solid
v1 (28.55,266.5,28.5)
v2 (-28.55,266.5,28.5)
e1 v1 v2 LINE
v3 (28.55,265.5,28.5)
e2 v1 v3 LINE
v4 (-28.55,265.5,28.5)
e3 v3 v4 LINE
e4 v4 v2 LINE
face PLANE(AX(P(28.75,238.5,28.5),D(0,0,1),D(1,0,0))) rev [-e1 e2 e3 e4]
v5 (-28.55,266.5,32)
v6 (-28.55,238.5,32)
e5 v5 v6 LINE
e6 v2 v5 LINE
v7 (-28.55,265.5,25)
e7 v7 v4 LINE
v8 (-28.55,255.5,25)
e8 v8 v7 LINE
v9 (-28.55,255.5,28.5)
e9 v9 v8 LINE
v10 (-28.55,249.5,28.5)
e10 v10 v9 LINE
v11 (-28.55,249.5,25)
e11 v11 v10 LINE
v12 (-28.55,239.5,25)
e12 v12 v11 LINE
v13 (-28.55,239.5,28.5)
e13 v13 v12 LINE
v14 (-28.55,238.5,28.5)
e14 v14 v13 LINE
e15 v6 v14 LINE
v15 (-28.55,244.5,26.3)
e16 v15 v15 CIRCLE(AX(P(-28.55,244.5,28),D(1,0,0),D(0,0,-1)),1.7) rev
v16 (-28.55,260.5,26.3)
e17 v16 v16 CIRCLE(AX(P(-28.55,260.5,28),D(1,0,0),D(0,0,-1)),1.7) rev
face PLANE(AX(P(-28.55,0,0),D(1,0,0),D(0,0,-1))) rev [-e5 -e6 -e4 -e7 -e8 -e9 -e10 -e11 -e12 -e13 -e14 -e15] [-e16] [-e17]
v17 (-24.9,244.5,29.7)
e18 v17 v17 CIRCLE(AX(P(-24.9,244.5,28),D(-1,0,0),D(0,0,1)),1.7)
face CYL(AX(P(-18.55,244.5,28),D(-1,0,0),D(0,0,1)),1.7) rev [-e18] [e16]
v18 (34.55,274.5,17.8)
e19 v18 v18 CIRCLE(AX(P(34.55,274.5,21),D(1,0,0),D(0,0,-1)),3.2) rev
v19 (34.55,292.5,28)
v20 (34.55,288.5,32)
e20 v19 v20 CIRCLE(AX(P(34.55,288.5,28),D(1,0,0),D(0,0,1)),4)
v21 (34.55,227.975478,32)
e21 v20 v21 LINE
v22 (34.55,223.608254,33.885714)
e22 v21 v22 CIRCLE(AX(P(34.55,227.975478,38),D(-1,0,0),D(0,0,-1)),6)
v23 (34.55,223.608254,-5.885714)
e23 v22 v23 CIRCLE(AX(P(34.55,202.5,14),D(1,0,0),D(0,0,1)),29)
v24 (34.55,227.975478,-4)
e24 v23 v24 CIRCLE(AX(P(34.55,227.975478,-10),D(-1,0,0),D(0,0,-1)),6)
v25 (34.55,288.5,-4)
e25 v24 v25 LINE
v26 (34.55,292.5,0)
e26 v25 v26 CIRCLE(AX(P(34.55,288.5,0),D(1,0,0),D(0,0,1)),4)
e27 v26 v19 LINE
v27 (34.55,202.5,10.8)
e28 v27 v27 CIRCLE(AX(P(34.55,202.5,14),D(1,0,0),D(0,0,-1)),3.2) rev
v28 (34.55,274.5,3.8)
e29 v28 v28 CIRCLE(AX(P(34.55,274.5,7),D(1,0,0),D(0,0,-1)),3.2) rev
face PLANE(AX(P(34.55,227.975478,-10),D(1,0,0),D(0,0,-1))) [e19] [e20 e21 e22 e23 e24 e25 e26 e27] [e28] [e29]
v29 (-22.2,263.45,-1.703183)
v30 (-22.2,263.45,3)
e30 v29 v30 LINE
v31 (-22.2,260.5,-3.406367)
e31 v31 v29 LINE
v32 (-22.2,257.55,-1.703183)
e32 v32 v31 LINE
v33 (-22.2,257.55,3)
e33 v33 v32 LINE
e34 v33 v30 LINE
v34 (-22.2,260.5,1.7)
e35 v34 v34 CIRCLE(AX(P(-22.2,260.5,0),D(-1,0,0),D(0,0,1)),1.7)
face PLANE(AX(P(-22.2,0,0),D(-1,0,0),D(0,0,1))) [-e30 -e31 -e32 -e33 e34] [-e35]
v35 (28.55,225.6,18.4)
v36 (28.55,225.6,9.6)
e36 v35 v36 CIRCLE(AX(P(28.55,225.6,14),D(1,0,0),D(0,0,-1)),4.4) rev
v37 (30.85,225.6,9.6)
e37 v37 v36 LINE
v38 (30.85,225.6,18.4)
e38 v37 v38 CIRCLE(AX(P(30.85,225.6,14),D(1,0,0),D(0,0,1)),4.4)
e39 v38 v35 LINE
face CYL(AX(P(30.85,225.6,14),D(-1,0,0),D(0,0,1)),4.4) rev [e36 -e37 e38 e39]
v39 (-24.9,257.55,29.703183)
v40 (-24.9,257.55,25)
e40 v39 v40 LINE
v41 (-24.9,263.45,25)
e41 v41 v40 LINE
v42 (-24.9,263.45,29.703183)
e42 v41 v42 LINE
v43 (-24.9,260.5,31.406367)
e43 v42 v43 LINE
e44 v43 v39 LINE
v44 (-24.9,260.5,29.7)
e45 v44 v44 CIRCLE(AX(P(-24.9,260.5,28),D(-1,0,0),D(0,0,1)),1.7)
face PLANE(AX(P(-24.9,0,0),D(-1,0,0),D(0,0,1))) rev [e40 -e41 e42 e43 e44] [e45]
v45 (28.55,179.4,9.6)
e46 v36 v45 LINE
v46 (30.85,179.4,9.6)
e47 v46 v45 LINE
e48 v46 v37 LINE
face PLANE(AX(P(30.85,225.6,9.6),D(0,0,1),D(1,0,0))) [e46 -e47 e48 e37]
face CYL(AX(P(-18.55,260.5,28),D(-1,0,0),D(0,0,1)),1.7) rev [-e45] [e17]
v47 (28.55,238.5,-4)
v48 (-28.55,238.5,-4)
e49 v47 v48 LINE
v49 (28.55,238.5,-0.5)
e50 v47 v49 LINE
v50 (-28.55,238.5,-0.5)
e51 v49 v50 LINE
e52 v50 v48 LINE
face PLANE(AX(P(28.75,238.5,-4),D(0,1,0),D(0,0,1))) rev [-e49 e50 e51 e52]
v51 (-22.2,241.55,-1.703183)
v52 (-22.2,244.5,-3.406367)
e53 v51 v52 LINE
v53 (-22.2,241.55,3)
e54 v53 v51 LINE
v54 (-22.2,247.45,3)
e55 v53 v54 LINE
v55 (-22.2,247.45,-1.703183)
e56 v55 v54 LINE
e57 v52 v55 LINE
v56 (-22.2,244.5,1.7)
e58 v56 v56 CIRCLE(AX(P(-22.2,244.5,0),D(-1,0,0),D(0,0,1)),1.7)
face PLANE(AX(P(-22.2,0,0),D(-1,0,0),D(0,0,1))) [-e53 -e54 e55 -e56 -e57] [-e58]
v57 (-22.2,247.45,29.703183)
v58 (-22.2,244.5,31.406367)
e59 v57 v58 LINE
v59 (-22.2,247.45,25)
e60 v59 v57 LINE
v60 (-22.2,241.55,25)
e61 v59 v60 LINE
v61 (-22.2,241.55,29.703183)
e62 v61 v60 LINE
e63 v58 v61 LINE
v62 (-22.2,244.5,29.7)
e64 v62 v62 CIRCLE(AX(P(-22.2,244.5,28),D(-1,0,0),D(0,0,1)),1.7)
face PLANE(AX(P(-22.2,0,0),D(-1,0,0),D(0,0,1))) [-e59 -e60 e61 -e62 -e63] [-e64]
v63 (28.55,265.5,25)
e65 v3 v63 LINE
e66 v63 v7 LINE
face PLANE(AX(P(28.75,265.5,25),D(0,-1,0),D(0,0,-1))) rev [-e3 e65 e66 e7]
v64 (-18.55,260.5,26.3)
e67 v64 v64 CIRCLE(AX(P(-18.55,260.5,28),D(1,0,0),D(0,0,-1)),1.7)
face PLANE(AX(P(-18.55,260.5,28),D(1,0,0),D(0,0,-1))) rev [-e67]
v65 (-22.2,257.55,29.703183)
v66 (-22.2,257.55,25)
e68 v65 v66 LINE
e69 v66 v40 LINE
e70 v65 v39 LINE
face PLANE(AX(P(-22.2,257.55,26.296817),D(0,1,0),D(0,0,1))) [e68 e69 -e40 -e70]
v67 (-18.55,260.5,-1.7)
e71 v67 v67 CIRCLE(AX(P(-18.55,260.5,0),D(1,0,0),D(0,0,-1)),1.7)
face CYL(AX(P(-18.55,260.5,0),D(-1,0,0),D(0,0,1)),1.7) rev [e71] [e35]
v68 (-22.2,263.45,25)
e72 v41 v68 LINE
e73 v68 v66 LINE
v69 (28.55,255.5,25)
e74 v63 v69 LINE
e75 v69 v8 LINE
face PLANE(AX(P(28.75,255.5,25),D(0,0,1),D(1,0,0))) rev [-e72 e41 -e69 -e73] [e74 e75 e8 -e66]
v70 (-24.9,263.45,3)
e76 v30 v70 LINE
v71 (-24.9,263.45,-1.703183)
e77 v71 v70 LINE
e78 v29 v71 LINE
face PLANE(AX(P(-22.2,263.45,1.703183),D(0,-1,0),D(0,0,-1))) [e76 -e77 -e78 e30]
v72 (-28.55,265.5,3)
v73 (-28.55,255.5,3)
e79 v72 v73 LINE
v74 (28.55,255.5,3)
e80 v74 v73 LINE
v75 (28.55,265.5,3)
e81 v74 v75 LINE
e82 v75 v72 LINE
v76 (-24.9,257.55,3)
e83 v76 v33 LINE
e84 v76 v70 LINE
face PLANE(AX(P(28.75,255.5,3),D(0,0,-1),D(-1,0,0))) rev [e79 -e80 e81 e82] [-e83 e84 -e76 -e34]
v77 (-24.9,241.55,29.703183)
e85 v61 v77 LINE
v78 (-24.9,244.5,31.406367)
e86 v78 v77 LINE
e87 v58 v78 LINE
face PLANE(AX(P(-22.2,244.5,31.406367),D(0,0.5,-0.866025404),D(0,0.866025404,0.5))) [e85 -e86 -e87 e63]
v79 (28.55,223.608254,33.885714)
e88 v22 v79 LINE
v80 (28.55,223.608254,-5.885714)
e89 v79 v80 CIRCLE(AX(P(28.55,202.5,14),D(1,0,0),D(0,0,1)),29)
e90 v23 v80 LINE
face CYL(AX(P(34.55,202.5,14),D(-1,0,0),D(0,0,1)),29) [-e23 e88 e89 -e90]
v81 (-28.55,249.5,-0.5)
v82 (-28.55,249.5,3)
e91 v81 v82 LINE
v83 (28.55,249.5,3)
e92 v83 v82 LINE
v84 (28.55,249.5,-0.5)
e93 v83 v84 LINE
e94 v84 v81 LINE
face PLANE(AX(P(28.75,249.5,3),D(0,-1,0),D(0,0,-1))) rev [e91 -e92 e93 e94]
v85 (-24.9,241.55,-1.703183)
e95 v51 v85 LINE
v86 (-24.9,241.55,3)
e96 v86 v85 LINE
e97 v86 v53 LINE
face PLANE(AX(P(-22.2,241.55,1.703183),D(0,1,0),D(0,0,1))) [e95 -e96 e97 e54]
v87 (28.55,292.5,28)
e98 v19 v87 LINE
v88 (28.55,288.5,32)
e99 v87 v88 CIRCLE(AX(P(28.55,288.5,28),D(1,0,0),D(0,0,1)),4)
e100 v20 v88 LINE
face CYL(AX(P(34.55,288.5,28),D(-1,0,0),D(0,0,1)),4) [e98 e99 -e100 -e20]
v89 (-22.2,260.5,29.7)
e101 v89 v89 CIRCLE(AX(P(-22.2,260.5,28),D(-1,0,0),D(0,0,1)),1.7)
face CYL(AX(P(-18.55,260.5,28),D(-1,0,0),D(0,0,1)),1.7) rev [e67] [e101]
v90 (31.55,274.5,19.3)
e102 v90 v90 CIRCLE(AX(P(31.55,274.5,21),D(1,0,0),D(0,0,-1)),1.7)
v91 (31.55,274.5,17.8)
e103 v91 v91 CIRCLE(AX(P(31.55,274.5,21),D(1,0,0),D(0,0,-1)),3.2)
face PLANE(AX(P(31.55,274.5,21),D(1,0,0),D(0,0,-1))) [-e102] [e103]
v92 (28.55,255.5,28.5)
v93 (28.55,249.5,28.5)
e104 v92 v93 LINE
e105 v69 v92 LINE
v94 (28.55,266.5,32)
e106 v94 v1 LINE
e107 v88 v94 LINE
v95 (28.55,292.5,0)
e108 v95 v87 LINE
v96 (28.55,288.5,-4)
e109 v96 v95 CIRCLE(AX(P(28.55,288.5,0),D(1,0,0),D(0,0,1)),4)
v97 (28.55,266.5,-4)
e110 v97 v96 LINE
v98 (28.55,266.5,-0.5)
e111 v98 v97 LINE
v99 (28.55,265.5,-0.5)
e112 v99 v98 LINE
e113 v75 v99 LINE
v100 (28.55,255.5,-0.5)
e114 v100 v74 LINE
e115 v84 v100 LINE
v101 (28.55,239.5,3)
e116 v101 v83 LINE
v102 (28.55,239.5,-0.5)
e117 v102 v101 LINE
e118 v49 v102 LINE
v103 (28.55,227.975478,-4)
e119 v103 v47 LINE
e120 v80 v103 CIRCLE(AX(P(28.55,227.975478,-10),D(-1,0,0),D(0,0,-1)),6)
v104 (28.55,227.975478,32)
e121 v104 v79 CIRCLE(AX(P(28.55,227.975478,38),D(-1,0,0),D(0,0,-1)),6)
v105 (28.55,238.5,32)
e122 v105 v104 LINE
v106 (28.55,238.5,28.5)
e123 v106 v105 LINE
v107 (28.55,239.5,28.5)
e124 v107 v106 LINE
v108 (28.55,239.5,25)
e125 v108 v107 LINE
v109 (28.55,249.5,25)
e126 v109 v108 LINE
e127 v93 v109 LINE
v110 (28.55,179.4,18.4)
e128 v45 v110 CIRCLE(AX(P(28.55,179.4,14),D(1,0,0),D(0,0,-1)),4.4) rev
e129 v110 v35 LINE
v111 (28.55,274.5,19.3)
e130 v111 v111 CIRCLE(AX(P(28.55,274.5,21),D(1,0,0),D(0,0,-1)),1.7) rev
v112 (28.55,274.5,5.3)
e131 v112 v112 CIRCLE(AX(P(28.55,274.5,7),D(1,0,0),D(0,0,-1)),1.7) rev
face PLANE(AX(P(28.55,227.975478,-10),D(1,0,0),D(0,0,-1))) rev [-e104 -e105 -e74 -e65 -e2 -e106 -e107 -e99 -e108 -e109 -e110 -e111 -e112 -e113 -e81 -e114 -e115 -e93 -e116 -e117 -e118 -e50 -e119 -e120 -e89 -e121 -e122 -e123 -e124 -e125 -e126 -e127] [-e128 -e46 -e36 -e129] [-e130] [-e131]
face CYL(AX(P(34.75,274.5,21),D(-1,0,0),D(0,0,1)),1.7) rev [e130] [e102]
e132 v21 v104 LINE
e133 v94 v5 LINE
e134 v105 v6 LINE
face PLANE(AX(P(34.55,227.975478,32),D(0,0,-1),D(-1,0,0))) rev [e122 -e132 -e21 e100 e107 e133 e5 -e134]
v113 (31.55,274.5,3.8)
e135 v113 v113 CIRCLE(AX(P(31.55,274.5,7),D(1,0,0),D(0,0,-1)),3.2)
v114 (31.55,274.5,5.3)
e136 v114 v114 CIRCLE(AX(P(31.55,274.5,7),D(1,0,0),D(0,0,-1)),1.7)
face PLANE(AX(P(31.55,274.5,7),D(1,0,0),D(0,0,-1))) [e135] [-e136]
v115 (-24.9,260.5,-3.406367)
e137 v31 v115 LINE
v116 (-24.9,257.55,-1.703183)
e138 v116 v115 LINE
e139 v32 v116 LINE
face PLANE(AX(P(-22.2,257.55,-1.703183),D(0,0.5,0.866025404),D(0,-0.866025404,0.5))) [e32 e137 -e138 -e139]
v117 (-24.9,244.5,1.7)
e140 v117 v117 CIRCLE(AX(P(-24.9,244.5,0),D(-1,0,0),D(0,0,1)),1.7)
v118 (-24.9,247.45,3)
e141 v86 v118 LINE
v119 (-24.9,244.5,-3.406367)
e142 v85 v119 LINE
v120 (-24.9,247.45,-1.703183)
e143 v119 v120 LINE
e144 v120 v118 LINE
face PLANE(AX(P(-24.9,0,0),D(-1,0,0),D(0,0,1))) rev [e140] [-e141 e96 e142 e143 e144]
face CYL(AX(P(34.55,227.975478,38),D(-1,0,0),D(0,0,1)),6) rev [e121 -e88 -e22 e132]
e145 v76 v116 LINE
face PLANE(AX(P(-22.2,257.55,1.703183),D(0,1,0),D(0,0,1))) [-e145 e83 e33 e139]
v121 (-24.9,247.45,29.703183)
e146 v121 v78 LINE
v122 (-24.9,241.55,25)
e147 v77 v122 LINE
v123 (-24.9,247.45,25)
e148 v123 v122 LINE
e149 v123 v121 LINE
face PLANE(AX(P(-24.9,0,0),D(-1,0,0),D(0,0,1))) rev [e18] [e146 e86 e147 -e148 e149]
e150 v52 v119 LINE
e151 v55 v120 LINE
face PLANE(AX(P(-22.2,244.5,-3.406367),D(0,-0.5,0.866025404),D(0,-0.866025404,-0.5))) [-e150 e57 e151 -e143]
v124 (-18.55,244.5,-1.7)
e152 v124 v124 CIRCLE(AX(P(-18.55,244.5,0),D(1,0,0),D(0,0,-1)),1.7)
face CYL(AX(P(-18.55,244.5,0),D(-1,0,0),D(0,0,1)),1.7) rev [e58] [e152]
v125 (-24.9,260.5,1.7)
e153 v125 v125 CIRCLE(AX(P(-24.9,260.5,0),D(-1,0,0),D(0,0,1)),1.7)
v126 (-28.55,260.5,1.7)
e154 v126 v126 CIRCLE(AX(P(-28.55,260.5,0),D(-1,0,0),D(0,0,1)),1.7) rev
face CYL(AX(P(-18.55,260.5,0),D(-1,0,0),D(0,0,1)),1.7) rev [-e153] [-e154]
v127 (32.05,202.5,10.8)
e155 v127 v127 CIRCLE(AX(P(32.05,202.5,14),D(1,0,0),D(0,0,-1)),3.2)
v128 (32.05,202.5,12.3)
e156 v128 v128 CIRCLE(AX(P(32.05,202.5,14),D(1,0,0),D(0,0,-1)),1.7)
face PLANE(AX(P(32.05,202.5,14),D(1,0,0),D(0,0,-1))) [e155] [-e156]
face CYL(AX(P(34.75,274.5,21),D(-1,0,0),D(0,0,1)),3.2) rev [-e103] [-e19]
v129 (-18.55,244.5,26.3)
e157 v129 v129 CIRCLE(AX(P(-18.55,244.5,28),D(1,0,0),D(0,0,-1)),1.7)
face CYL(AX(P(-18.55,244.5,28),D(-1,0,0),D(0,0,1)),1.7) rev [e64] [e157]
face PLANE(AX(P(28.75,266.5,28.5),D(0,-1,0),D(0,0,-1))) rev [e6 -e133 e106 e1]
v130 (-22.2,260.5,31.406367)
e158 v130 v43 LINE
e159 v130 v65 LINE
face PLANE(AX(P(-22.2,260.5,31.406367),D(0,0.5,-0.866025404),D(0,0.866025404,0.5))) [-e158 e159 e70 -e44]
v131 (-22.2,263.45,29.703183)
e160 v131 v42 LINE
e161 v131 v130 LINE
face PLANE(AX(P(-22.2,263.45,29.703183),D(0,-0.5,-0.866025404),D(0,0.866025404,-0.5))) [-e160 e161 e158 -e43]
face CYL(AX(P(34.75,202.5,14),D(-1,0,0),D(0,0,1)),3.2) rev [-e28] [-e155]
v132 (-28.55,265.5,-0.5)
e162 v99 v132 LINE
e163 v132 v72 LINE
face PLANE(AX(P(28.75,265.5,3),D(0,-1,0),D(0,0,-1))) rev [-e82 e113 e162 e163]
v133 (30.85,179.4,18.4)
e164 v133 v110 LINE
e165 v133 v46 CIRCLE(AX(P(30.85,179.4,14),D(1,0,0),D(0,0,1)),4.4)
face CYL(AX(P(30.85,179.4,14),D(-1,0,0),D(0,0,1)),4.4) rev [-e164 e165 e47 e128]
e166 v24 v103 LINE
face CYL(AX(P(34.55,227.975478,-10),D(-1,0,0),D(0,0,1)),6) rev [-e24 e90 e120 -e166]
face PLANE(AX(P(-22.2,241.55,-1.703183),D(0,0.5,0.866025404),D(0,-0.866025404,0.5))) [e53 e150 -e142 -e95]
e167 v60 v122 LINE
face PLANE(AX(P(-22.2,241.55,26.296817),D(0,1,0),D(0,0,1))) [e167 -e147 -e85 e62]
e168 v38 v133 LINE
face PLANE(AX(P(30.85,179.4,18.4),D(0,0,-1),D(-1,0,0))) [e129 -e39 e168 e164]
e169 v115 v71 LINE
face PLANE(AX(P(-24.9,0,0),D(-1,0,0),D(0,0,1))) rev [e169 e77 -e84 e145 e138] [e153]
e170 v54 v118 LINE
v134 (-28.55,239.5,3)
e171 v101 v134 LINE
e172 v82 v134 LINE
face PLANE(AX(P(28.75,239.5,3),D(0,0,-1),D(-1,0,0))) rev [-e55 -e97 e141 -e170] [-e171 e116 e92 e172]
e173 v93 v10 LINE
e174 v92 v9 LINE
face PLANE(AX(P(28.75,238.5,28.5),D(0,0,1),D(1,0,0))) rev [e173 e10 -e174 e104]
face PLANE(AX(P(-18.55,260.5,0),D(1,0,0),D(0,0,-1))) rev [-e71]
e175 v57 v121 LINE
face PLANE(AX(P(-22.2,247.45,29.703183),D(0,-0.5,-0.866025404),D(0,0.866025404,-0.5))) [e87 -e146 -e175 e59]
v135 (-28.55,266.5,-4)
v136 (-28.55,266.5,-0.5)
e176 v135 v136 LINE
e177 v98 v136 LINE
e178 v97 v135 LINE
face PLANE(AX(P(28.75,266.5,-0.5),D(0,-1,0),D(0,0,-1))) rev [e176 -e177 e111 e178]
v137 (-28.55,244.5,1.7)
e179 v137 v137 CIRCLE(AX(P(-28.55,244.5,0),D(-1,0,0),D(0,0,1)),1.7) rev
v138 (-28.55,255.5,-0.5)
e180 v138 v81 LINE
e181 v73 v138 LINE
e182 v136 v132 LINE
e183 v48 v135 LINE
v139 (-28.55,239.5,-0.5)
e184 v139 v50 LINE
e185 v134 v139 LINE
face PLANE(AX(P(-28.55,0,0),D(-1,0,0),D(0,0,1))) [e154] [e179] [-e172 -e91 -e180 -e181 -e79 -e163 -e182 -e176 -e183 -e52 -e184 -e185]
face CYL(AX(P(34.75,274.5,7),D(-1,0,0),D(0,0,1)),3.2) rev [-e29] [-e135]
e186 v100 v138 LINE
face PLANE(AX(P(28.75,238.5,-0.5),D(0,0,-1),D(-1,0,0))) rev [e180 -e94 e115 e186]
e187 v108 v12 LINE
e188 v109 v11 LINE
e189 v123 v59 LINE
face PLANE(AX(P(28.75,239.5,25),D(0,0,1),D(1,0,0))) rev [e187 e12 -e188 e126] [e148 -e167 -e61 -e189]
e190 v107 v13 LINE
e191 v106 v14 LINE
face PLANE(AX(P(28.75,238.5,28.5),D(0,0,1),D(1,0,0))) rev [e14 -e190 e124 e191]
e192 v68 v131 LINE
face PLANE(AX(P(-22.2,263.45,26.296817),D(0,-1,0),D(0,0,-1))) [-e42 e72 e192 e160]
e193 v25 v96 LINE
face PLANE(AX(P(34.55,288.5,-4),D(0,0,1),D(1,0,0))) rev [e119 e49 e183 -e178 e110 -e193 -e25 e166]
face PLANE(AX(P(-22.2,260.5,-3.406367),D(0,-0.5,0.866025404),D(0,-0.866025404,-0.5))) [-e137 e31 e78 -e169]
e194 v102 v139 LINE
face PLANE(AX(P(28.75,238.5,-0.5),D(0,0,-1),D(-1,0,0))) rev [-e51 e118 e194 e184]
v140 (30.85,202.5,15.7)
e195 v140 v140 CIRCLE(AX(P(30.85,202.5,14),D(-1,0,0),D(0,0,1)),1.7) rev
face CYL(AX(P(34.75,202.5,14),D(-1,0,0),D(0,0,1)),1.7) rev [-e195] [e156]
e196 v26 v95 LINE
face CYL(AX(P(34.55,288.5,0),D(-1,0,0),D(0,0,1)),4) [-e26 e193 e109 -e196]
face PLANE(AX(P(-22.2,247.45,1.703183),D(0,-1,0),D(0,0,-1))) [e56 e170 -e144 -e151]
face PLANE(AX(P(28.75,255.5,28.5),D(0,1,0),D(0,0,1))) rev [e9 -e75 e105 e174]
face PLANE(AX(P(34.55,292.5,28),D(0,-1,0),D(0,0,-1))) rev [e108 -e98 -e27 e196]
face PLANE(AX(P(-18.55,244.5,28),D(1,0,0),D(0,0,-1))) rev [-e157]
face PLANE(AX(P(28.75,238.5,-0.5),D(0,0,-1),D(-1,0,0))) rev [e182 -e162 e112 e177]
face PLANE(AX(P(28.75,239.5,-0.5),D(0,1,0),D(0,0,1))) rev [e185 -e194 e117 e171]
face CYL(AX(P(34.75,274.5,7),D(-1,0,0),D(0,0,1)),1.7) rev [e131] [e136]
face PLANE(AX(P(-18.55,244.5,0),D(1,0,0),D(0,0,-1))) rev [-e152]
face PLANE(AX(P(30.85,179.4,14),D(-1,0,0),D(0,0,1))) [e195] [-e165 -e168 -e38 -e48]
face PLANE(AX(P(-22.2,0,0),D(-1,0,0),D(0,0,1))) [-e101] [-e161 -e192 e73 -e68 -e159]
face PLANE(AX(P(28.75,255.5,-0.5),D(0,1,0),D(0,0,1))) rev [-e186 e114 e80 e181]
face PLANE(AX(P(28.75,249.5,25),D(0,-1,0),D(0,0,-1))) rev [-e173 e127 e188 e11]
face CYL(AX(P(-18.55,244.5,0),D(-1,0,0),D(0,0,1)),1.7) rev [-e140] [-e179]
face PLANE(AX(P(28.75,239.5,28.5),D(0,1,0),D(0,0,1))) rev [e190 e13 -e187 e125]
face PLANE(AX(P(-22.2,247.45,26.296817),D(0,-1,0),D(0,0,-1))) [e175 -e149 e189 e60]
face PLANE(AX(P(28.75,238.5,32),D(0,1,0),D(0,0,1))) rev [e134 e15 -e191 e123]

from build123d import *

# Parameters (mm, degrees)
PLATE_START                   = 28.55
PLATE_D_DEPTH                 = 6
BOX_START                     = -28.55
SKETCH2_W                     = 3.5
SKETCH2_H                     = 28
BOX_WALLS_DEPTH               = 57.3
WALL_START                    = -28.55
SKETCH3_W                     = 3.5
SKETCH3_H                     = 10
WALL_BOSSES_DEPTH             = 57.3
HORN_START                    = 28.35
HORN_POCKET_DEPTH             = 2.5
BOLT_START                    = 28.35
SKETCH5_R                     = 1.7
BOLT_HOLES_DEPTH              = 6.4
HUB_START                     = 32.05
SKETCH6_R                     = 3.2
HUB_COUNTERBORE_DEPTH         = 2.7
HEAD_MOUNT_START              = 31.55
SKETCH7_R                     = 3.2
HEAD_MOUNT_COUNTERBORES_DEPTH = 3.2
COVER_START                   = -28.75
SKETCH8_R                     = 1.7
COVER_BOLT_HOLES_DEPTH        = 10.2
COVER_START_2                 = -24.9
COVER_NUT_SLOTS_DEPTH         = 2.7


with BuildPart() as part:
    # Sketch1 → Plate D (new body)
    with BuildSketch(Plane(origin=(0, 0, 0), x_dir=(0, 0, -1), z_dir=(1, 0, 0)).offset(PLATE_START)):
        with BuildLine():
            Line((-32, 227.975478406), (-32, 288.5))
            ThreePointArc((-32, 288.5), (-30.828427125, 291.328427125), (-28, 292.5))
            Line((-28, 292.5), (0, 292.5))
            ThreePointArc((0, 292.5), (2.828427125, 291.328427125), (4, 288.5))
            Line((4, 288.5), (4, 227.975478406))
            ThreePointArc((4, 227.975478406), (4.49156491, 225.597003504), (5.885714286, 223.608253536))
            ThreePointArc((5.885714286, 223.608253536), (-14, 173.5), (-33.885714286, 223.608253536))
            ThreePointArc((-33.885714286, 223.608253536), (-32.49156491, 225.597003504), (-32, 227.975478406))
        make_face()
    extrude(amount=PLATE_D_DEPTH)

    # Sketch2 → Box walls (add)
    with BuildSketch(Plane(origin=(0, 0, 0), x_dir=(0, 0, -1), z_dir=(1, 0, 0)).offset(BOX_START)):
        with Locations((2.25, 252.5)):
            Rectangle(SKETCH2_W, SKETCH2_H)
        with Locations((-30.25, 252.5)):
            Rectangle(SKETCH2_W, SKETCH2_H)
    extrude(amount=BOX_WALLS_DEPTH)

    # Sketch3 → Wall bosses (add)
    with BuildSketch(Plane(origin=(0, 0, 0), x_dir=(0, 0, -1), z_dir=(1, 0, 0)).offset(WALL_START)):
        with Locations((-1.25, 244.5)):
            Rectangle(SKETCH3_W, SKETCH3_H)
        with Locations((-26.75, 244.5)):
            Rectangle(SKETCH3_W, SKETCH3_H)
        with Locations((-1.25, 260.5)):
            Rectangle(SKETCH3_W, SKETCH3_H)
        with Locations((-26.75, 260.5)):
            Rectangle(SKETCH3_W, SKETCH3_H)
    extrude(amount=WALL_BOSSES_DEPTH)

    # Sketch4 → Horn pocket (cut)
    with BuildSketch(Plane(origin=(0, 0, 0), x_dir=(0, 0, -1), z_dir=(1, 0, 0)).offset(HORN_START)):
        with BuildLine():
            Line((-18.4, 179.4), (-18.4, 225.6))
            ThreePointArc((-18.4, 225.6), (-14, 230), (-9.6, 225.6))
            Line((-9.6, 225.6), (-9.6, 179.4))
            ThreePointArc((-9.6, 179.4), (-14, 175), (-18.4, 179.4))
        make_face()
    extrude(amount=HORN_POCKET_DEPTH, mode=Mode.SUBTRACT)

    # Sketch5 → Bolt holes (cut)
    with BuildSketch(Plane(origin=(0, 0, 0), x_dir=(0, 0, -1), z_dir=(1, 0, 0)).offset(BOLT_START)):
        with Locations((-14, 202.5)):
            Circle(SKETCH5_R)
        with Locations((-7, 274.5)):
            Circle(SKETCH5_R)
        with Locations((-21, 274.5)):
            Circle(SKETCH5_R)
    extrude(amount=BOLT_HOLES_DEPTH, mode=Mode.SUBTRACT)

    # Sketch6 → Hub counterbore (cut)
    with BuildSketch(Plane(origin=(0, 0, 0), x_dir=(0, 0, -1), z_dir=(1, 0, 0)).offset(HUB_START)):
        with Locations((-14, 202.5)):
            Circle(SKETCH6_R)
    extrude(amount=HUB_COUNTERBORE_DEPTH, mode=Mode.SUBTRACT)

    # Sketch7 → Head-mount counterbores (cut)
    with BuildSketch(Plane(origin=(0, 0, 0), x_dir=(0, 0, -1), z_dir=(1, 0, 0)).offset(HEAD_MOUNT_START)):
        with Locations((-7, 274.5)):
            Circle(SKETCH7_R)
        with Locations((-21, 274.5)):
            Circle(SKETCH7_R)
    extrude(amount=HEAD_MOUNT_COUNTERBORES_DEPTH, mode=Mode.SUBTRACT)

    # Sketch8 → Cover bolt holes (cut)
    with BuildSketch(Plane(origin=(0, 0, 0), x_dir=(0, 0, -1), z_dir=(1, 0, 0)).offset(COVER_START)):
        with Locations((0, 244.5)):
            Circle(SKETCH8_R)
        with Locations((-28, 244.5)):
            Circle(SKETCH8_R)
        with Locations((0, 260.5)):
            Circle(SKETCH8_R)
        with Locations((-28, 260.5)):
            Circle(SKETCH8_R)
    extrude(amount=COVER_BOLT_HOLES_DEPTH, mode=Mode.SUBTRACT)

    # Sketch9 → Cover nut slots (cut)
    with BuildSketch(Plane(origin=(0, 0, 0), x_dir=(0, 0, -1), z_dir=(1, 0, 0)).offset(COVER_START_2)):
        Polygon((-1.703183294, 241.55), (1.703183294, 241.55), (3.406366588, 244.5), (1.703183294, 247.45), (-1.703183294, 247.45), (-3.4, 247.45), (-3.4, 241.55), align=None)
        Polygon((-26.296816706, 247.45), (-29.703183294, 247.45), (-31.406366588, 244.5), (-29.703183294, 241.55), (-26.296816706, 241.55), (-24.6, 241.55), (-24.6, 247.45), align=None)
        Polygon((-1.703183294, 257.55), (1.703183294, 257.55), (3.406366588, 260.5), (1.703183294, 263.45), (-1.703183294, 263.45), (-3.4, 263.45), (-3.4, 257.55), align=None)
        Polygon((-26.296816706, 263.45), (-29.703183294, 263.45), (-31.406366588, 260.5), (-29.703183294, 257.55), (-26.296816706, 257.55), (-24.6, 257.55), (-24.6, 263.45), align=None)
    extrude(amount=COVER_NUT_SLOTS_DEPTH, mode=Mode.SUBTRACT)


solid = part.part
